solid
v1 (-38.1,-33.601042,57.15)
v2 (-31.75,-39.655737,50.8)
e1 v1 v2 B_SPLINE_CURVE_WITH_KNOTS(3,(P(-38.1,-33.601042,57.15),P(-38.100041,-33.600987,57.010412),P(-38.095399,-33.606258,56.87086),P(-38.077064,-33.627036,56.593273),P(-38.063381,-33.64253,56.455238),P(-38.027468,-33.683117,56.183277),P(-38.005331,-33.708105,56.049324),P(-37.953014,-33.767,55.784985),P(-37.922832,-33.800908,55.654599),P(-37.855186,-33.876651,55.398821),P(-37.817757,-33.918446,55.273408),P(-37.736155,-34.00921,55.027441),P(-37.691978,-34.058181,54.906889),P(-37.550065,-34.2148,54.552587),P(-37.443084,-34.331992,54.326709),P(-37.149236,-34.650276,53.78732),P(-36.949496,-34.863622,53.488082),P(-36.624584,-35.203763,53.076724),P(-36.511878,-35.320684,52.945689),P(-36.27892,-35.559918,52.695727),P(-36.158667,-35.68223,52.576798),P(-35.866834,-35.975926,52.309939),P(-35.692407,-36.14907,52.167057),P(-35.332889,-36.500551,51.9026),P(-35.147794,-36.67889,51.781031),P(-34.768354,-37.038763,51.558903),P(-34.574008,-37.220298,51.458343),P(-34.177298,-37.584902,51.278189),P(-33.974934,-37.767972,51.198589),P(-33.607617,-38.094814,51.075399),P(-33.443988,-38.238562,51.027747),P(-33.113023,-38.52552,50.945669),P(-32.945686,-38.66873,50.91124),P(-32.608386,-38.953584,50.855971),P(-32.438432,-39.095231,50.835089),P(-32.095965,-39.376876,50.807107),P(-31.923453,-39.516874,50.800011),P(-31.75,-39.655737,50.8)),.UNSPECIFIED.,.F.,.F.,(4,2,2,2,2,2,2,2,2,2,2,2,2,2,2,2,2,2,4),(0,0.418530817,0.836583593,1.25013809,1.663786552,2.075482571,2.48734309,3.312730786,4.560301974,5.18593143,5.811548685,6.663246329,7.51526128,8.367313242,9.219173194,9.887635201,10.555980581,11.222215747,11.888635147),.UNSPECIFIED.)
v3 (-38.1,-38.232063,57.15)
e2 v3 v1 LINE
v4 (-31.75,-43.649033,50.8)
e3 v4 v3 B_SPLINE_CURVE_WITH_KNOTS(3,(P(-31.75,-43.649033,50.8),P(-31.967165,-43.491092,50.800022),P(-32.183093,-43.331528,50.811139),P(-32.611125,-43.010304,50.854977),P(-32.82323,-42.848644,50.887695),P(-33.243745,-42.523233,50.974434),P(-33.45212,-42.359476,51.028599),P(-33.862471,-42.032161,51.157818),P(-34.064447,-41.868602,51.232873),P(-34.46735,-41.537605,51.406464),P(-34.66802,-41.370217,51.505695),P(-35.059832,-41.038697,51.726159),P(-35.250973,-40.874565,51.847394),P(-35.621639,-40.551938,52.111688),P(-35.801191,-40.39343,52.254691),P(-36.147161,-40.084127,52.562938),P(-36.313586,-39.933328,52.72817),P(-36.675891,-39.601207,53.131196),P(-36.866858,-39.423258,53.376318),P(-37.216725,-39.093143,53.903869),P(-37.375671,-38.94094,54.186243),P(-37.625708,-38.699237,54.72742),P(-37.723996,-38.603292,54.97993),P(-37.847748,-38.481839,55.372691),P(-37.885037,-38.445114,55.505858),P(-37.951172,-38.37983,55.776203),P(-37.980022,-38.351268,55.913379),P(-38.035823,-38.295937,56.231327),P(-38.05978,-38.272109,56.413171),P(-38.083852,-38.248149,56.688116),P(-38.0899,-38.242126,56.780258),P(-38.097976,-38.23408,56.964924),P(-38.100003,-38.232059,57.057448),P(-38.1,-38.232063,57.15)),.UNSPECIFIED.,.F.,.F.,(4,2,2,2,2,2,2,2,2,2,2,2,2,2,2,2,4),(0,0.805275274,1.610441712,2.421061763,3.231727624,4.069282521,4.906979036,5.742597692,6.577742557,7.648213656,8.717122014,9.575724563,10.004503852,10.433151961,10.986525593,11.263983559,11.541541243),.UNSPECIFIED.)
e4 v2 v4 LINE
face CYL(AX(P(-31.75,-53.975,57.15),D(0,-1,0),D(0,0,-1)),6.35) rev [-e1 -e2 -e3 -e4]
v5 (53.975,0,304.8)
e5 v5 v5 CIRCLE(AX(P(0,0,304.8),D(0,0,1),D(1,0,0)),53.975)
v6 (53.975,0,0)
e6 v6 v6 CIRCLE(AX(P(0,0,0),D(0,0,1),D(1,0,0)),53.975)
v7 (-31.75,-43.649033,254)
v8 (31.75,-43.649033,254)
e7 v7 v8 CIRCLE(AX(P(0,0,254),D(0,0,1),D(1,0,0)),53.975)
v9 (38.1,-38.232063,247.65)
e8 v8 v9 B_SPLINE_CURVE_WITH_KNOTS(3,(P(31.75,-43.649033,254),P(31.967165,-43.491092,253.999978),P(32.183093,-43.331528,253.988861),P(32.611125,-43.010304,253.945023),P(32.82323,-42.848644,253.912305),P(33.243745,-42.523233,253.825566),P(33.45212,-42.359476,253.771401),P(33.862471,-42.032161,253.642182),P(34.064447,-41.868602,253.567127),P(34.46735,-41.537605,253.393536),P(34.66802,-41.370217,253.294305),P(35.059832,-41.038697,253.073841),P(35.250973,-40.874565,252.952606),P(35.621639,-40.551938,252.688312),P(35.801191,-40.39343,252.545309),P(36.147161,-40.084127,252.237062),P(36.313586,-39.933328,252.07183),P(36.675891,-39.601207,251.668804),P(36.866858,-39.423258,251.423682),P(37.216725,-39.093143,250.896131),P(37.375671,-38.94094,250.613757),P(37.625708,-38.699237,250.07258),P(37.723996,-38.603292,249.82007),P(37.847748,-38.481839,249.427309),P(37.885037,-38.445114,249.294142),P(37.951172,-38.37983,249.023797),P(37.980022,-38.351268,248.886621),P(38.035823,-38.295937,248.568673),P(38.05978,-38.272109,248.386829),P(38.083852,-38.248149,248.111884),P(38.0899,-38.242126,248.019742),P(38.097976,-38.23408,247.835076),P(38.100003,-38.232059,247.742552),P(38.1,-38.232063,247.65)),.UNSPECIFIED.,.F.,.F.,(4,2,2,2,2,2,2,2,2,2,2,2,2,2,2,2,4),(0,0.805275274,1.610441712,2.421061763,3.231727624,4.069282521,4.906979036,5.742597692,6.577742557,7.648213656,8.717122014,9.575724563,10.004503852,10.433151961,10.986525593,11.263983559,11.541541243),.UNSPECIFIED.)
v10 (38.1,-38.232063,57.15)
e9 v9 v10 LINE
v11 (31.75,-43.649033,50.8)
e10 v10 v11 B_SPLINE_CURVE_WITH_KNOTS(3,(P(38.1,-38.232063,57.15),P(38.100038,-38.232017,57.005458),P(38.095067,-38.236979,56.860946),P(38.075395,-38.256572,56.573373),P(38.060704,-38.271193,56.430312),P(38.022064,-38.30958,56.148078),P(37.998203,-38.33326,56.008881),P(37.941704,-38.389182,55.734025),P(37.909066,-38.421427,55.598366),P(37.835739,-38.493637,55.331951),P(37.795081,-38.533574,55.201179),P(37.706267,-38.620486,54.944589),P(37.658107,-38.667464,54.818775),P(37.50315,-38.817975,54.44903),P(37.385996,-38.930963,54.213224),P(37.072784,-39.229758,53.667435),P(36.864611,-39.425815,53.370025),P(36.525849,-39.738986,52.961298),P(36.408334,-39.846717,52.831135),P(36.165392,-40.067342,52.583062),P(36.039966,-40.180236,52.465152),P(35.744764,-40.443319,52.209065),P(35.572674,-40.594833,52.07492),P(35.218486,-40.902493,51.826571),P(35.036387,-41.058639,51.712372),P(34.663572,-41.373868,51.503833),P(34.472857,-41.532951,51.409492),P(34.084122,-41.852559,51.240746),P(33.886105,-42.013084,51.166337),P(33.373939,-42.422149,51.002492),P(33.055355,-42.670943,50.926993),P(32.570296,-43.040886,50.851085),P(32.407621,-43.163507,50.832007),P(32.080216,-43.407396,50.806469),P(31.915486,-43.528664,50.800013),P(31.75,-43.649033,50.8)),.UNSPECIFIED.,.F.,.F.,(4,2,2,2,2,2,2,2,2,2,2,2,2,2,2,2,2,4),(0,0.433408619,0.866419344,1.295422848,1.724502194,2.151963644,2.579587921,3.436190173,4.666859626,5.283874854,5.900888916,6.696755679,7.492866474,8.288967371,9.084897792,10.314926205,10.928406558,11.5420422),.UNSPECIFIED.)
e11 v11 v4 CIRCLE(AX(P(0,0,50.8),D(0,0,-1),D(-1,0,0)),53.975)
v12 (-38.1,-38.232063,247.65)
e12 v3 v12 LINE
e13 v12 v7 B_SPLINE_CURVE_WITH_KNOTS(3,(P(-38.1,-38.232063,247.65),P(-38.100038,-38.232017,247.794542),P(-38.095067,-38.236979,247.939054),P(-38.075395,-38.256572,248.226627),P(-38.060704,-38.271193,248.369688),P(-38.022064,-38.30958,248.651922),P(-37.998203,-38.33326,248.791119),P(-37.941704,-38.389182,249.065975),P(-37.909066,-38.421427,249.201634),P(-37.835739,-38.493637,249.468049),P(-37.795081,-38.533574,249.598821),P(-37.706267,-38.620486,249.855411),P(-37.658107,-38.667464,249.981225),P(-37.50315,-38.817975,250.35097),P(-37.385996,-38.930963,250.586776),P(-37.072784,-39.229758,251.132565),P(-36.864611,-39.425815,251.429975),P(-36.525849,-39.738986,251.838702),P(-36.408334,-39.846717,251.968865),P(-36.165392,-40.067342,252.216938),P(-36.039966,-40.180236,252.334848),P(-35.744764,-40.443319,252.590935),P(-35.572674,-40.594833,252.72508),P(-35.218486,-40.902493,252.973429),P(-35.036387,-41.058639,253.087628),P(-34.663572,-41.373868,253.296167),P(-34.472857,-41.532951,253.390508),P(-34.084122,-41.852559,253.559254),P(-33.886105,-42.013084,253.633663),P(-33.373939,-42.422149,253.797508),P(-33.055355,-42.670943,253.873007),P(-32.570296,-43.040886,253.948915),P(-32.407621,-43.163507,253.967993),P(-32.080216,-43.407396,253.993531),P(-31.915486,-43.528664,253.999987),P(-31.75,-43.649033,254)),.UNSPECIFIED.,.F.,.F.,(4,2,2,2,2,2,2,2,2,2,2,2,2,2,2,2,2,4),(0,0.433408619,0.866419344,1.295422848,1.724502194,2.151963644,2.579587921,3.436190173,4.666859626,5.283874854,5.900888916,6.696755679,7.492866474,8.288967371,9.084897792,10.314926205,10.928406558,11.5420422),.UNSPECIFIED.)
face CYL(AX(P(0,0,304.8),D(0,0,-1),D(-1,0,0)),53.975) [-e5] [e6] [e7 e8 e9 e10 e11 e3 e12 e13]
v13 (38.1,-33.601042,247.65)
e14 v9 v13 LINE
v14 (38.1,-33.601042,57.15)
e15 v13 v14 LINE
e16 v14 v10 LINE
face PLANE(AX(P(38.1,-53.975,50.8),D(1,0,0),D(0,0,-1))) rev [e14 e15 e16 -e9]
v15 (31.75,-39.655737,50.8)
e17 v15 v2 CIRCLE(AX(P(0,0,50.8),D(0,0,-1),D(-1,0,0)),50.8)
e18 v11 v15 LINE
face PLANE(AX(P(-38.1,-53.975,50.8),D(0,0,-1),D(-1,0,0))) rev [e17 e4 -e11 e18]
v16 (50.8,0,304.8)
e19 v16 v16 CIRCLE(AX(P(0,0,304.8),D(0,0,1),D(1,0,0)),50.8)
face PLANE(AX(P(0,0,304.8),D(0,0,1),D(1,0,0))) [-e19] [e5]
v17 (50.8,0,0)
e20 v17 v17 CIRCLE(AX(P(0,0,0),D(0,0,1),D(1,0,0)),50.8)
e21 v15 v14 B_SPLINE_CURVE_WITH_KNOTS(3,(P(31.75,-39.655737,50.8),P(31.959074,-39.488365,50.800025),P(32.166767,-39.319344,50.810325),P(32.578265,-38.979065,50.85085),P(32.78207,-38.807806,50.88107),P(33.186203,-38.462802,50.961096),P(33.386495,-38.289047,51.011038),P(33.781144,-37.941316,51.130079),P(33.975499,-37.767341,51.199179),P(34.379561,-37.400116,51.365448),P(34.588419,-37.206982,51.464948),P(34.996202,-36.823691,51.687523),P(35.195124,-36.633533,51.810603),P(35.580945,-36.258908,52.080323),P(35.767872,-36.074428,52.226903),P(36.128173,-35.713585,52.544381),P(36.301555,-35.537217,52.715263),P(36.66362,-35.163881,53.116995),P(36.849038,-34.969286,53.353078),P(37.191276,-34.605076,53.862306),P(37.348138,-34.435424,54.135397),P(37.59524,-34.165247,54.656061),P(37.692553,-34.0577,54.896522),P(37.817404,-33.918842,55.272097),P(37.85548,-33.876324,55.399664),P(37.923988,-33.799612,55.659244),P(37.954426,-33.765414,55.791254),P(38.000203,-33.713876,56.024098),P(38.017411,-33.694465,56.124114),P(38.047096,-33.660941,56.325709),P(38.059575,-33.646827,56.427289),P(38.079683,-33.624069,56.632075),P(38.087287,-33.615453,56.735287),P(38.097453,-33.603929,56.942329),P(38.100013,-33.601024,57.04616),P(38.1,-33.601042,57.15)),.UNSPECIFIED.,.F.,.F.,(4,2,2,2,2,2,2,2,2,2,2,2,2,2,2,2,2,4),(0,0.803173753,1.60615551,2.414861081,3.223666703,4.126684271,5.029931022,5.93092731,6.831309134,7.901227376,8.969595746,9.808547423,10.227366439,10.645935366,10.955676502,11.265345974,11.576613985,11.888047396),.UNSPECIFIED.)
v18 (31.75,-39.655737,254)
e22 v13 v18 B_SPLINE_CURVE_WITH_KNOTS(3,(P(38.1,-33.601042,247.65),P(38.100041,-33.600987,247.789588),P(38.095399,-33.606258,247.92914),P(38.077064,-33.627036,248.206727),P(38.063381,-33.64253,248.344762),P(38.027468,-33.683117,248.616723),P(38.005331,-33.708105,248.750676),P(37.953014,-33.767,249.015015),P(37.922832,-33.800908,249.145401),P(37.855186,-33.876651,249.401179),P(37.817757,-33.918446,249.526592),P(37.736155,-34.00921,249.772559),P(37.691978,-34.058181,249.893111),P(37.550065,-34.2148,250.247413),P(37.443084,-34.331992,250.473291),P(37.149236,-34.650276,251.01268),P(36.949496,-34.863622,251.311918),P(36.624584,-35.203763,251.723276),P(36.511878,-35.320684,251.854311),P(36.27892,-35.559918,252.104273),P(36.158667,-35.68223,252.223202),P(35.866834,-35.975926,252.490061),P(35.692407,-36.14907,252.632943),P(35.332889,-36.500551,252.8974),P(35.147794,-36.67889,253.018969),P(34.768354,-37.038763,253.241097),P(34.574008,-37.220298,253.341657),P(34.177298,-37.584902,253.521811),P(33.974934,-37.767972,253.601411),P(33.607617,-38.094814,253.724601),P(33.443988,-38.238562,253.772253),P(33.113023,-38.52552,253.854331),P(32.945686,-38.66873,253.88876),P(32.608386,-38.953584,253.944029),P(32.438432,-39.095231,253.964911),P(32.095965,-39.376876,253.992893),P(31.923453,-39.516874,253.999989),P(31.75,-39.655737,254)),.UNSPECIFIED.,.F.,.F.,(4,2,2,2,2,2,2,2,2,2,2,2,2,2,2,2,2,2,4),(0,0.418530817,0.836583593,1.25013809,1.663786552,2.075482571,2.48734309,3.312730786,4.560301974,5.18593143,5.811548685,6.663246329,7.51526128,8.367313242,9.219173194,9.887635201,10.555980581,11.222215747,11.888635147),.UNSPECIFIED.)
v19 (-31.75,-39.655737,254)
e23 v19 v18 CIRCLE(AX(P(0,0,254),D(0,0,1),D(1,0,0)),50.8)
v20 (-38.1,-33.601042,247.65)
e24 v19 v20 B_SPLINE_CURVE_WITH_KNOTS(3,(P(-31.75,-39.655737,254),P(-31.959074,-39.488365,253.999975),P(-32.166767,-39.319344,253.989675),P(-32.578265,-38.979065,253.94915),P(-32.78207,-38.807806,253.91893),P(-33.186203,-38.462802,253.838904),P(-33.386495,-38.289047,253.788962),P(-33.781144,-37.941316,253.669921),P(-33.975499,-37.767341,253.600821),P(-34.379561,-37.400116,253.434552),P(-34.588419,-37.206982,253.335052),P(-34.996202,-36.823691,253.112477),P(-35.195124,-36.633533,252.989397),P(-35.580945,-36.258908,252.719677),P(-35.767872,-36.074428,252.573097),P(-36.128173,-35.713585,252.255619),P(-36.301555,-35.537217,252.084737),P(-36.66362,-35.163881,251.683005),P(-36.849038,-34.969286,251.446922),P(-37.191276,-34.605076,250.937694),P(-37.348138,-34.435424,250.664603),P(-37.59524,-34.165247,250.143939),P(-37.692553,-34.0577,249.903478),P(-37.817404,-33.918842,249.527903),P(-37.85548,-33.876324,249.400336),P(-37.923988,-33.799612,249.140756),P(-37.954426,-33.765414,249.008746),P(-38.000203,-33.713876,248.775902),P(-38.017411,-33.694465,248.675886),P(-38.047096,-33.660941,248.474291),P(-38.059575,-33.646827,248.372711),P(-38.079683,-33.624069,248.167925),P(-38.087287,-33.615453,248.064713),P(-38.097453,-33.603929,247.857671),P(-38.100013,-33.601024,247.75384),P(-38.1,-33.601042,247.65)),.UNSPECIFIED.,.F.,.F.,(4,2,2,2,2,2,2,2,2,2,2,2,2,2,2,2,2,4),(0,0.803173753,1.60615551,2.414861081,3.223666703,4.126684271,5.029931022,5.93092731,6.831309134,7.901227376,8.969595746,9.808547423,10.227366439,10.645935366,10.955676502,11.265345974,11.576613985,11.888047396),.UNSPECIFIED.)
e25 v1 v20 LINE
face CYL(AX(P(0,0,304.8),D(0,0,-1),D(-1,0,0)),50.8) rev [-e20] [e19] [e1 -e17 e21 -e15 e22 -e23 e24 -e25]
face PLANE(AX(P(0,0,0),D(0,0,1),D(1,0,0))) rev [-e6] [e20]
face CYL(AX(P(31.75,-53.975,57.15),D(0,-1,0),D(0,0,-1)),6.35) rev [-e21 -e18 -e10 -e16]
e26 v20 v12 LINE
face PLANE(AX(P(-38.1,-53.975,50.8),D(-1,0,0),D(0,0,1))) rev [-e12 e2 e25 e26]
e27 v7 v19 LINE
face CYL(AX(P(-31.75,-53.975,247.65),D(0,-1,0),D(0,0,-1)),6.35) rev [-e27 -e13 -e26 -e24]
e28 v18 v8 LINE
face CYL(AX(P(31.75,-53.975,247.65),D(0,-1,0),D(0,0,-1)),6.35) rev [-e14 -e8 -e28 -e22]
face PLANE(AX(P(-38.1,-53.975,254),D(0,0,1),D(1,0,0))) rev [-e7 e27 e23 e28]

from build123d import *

# Parameters (mm, degrees)
SKETCH1_R      = 53.975
SKETCH1_R_2    = 50.8
EXTRUDE1_DEPTH = 304.8
SKETCH2_W      = 76.2
SKETCH2_H      = 203.2
EXTRUDE2_DEPTH = 315.212732476
FILLET1_R      = 6.35


with BuildPart() as part:
    # Sketch1 → Extrude1 (new body)
    with BuildSketch(Plane.XY):
        with Locations(Location((0, 0, 0), (0, 0, 180))):
            Circle(SKETCH1_R)
        with Locations(Location((0, 0, 0), (0, 0, 180))):
            Circle(SKETCH1_R_2, mode=Mode.SUBTRACT)
    extrude(amount=EXTRUDE1_DEPTH)

    # Sketch2 → Extrude2 (cut, through all)
    with BuildSketch(Plane(origin=(0, 0, 0), x_dir=(1, 0, 0), z_dir=(0, 1, 0))):
        with Locations((0, -152.4)):
            Rectangle(SKETCH2_W, SKETCH2_H)
    extrude(amount=-EXTRUDE2_DEPTH, mode=Mode.SUBTRACT)

    # Fillet1
    # the kernel refuses this fillet: 6.35 mm, written as the material it adds along each edge
    with BuildSketch(Plane(origin=(-38.1, -17.726041651, 254), x_dir=(0, 0, -1), z_dir=(0, -1, 0))) as fillet1_piece_1_section:
        with BuildLine():
            CenterArc((FILLET1_R, FILLET1_R), FILLET1_R, 180, 90)
            Line((0, FILLET1_R), (0, 0))
            Line((0, 0), (FILLET1_R, 0))
        make_face()
    fillet1_piece_1 = extrude(amount=36.381021137, mode=Mode.PRIVATE)
    fillet1_piece_1 = fillet1_piece_1 & Plane(origin=(0, 0, 252.560306593), x_dir=(-1, 0, 0), z_dir=(0, 0, -1)) * Cylinder(53.975, 99, mode=Mode.PRIVATE)
    fillet1_piece_1 = fillet1_piece_1 - Plane(origin=(0, 0, 252.560306593), x_dir=(-1, 0, 0), z_dir=(0, 0, -1)) * Cylinder(50.8, 99, mode=Mode.PRIVATE)
    add(fillet1_piece_1)
    with BuildSketch(Plane(origin=(-38.1, -17.726041651, 50.8), x_dir=(1, 0, 0), z_dir=(0, -1, 0))) as fillet1_piece_2_section:
        with BuildLine():
            CenterArc((FILLET1_R, FILLET1_R), FILLET1_R, 180, 90)
            Line((0, FILLET1_R), (0, 0))
            Line((0, 0), (FILLET1_R, 0))
        make_face()
    fillet1_piece_2 = extrude(amount=36.381021137, mode=Mode.PRIVATE)
    fillet1_piece_2 = fillet1_piece_2 & Plane(origin=(0, 0, 52.23969466), x_dir=(-1, 0, 0), z_dir=(0, 0, -1)) * Cylinder(53.975, 99, mode=Mode.PRIVATE)
    fillet1_piece_2 = fillet1_piece_2 - Plane(origin=(0, 0, 52.23969466), x_dir=(-1, 0, 0), z_dir=(0, 0, -1)) * Cylinder(50.8, 99, mode=Mode.PRIVATE)
    add(fillet1_piece_2)
    with BuildSketch(Plane(origin=(38.1, -17.726041651, 50.8), x_dir=(-1, 0, 0), z_dir=(0, -1, 0))) as fillet1_piece_3_section:
        with BuildLine():
            CenterArc((FILLET1_R, -FILLET1_R), FILLET1_R, 90, 90)
            Line((0, -FILLET1_R), (0, 0))
            Line((0, 0), (FILLET1_R, 0))
        make_face()
    fillet1_piece_3 = extrude(amount=36.381021137, mode=Mode.PRIVATE)
    fillet1_piece_3 = fillet1_piece_3 & Plane(origin=(0, 0, 52.239693302), x_dir=(-1, 0, 0), z_dir=(0, 0, -1)) * Cylinder(53.975, 99, mode=Mode.PRIVATE)
    fillet1_piece_3 = fillet1_piece_3 - Plane(origin=(0, 0, 52.239693302), x_dir=(-1, 0, 0), z_dir=(0, 0, -1)) * Cylinder(50.8, 99, mode=Mode.PRIVATE)
    add(fillet1_piece_3)
    with BuildSketch(Plane(origin=(38.1, -17.726041651, 254), x_dir=(-1, 0, 0), z_dir=(0, -1, 0))) as fillet1_piece_4_section:
        with BuildLine():
            CenterArc((FILLET1_R, FILLET1_R), FILLET1_R, 180, 90)
            Line((0, FILLET1_R), (0, 0))
            Line((0, 0), (FILLET1_R, 0))
        make_face()
    fillet1_piece_4 = extrude(amount=36.381021137, mode=Mode.PRIVATE)
    fillet1_piece_4 = fillet1_piece_4 & Plane(origin=(0, 0, 252.560306698), x_dir=(-1, 0, 0), z_dir=(0, 0, -1)) * Cylinder(53.975, 99, mode=Mode.PRIVATE)
    fillet1_piece_4 = fillet1_piece_4 - Plane(origin=(0, 0, 252.560306698), x_dir=(-1, 0, 0), z_dir=(0, 0, -1)) * Cylinder(50.8, 99, mode=Mode.PRIVATE)
    add(fillet1_piece_4)


solid = part.part
